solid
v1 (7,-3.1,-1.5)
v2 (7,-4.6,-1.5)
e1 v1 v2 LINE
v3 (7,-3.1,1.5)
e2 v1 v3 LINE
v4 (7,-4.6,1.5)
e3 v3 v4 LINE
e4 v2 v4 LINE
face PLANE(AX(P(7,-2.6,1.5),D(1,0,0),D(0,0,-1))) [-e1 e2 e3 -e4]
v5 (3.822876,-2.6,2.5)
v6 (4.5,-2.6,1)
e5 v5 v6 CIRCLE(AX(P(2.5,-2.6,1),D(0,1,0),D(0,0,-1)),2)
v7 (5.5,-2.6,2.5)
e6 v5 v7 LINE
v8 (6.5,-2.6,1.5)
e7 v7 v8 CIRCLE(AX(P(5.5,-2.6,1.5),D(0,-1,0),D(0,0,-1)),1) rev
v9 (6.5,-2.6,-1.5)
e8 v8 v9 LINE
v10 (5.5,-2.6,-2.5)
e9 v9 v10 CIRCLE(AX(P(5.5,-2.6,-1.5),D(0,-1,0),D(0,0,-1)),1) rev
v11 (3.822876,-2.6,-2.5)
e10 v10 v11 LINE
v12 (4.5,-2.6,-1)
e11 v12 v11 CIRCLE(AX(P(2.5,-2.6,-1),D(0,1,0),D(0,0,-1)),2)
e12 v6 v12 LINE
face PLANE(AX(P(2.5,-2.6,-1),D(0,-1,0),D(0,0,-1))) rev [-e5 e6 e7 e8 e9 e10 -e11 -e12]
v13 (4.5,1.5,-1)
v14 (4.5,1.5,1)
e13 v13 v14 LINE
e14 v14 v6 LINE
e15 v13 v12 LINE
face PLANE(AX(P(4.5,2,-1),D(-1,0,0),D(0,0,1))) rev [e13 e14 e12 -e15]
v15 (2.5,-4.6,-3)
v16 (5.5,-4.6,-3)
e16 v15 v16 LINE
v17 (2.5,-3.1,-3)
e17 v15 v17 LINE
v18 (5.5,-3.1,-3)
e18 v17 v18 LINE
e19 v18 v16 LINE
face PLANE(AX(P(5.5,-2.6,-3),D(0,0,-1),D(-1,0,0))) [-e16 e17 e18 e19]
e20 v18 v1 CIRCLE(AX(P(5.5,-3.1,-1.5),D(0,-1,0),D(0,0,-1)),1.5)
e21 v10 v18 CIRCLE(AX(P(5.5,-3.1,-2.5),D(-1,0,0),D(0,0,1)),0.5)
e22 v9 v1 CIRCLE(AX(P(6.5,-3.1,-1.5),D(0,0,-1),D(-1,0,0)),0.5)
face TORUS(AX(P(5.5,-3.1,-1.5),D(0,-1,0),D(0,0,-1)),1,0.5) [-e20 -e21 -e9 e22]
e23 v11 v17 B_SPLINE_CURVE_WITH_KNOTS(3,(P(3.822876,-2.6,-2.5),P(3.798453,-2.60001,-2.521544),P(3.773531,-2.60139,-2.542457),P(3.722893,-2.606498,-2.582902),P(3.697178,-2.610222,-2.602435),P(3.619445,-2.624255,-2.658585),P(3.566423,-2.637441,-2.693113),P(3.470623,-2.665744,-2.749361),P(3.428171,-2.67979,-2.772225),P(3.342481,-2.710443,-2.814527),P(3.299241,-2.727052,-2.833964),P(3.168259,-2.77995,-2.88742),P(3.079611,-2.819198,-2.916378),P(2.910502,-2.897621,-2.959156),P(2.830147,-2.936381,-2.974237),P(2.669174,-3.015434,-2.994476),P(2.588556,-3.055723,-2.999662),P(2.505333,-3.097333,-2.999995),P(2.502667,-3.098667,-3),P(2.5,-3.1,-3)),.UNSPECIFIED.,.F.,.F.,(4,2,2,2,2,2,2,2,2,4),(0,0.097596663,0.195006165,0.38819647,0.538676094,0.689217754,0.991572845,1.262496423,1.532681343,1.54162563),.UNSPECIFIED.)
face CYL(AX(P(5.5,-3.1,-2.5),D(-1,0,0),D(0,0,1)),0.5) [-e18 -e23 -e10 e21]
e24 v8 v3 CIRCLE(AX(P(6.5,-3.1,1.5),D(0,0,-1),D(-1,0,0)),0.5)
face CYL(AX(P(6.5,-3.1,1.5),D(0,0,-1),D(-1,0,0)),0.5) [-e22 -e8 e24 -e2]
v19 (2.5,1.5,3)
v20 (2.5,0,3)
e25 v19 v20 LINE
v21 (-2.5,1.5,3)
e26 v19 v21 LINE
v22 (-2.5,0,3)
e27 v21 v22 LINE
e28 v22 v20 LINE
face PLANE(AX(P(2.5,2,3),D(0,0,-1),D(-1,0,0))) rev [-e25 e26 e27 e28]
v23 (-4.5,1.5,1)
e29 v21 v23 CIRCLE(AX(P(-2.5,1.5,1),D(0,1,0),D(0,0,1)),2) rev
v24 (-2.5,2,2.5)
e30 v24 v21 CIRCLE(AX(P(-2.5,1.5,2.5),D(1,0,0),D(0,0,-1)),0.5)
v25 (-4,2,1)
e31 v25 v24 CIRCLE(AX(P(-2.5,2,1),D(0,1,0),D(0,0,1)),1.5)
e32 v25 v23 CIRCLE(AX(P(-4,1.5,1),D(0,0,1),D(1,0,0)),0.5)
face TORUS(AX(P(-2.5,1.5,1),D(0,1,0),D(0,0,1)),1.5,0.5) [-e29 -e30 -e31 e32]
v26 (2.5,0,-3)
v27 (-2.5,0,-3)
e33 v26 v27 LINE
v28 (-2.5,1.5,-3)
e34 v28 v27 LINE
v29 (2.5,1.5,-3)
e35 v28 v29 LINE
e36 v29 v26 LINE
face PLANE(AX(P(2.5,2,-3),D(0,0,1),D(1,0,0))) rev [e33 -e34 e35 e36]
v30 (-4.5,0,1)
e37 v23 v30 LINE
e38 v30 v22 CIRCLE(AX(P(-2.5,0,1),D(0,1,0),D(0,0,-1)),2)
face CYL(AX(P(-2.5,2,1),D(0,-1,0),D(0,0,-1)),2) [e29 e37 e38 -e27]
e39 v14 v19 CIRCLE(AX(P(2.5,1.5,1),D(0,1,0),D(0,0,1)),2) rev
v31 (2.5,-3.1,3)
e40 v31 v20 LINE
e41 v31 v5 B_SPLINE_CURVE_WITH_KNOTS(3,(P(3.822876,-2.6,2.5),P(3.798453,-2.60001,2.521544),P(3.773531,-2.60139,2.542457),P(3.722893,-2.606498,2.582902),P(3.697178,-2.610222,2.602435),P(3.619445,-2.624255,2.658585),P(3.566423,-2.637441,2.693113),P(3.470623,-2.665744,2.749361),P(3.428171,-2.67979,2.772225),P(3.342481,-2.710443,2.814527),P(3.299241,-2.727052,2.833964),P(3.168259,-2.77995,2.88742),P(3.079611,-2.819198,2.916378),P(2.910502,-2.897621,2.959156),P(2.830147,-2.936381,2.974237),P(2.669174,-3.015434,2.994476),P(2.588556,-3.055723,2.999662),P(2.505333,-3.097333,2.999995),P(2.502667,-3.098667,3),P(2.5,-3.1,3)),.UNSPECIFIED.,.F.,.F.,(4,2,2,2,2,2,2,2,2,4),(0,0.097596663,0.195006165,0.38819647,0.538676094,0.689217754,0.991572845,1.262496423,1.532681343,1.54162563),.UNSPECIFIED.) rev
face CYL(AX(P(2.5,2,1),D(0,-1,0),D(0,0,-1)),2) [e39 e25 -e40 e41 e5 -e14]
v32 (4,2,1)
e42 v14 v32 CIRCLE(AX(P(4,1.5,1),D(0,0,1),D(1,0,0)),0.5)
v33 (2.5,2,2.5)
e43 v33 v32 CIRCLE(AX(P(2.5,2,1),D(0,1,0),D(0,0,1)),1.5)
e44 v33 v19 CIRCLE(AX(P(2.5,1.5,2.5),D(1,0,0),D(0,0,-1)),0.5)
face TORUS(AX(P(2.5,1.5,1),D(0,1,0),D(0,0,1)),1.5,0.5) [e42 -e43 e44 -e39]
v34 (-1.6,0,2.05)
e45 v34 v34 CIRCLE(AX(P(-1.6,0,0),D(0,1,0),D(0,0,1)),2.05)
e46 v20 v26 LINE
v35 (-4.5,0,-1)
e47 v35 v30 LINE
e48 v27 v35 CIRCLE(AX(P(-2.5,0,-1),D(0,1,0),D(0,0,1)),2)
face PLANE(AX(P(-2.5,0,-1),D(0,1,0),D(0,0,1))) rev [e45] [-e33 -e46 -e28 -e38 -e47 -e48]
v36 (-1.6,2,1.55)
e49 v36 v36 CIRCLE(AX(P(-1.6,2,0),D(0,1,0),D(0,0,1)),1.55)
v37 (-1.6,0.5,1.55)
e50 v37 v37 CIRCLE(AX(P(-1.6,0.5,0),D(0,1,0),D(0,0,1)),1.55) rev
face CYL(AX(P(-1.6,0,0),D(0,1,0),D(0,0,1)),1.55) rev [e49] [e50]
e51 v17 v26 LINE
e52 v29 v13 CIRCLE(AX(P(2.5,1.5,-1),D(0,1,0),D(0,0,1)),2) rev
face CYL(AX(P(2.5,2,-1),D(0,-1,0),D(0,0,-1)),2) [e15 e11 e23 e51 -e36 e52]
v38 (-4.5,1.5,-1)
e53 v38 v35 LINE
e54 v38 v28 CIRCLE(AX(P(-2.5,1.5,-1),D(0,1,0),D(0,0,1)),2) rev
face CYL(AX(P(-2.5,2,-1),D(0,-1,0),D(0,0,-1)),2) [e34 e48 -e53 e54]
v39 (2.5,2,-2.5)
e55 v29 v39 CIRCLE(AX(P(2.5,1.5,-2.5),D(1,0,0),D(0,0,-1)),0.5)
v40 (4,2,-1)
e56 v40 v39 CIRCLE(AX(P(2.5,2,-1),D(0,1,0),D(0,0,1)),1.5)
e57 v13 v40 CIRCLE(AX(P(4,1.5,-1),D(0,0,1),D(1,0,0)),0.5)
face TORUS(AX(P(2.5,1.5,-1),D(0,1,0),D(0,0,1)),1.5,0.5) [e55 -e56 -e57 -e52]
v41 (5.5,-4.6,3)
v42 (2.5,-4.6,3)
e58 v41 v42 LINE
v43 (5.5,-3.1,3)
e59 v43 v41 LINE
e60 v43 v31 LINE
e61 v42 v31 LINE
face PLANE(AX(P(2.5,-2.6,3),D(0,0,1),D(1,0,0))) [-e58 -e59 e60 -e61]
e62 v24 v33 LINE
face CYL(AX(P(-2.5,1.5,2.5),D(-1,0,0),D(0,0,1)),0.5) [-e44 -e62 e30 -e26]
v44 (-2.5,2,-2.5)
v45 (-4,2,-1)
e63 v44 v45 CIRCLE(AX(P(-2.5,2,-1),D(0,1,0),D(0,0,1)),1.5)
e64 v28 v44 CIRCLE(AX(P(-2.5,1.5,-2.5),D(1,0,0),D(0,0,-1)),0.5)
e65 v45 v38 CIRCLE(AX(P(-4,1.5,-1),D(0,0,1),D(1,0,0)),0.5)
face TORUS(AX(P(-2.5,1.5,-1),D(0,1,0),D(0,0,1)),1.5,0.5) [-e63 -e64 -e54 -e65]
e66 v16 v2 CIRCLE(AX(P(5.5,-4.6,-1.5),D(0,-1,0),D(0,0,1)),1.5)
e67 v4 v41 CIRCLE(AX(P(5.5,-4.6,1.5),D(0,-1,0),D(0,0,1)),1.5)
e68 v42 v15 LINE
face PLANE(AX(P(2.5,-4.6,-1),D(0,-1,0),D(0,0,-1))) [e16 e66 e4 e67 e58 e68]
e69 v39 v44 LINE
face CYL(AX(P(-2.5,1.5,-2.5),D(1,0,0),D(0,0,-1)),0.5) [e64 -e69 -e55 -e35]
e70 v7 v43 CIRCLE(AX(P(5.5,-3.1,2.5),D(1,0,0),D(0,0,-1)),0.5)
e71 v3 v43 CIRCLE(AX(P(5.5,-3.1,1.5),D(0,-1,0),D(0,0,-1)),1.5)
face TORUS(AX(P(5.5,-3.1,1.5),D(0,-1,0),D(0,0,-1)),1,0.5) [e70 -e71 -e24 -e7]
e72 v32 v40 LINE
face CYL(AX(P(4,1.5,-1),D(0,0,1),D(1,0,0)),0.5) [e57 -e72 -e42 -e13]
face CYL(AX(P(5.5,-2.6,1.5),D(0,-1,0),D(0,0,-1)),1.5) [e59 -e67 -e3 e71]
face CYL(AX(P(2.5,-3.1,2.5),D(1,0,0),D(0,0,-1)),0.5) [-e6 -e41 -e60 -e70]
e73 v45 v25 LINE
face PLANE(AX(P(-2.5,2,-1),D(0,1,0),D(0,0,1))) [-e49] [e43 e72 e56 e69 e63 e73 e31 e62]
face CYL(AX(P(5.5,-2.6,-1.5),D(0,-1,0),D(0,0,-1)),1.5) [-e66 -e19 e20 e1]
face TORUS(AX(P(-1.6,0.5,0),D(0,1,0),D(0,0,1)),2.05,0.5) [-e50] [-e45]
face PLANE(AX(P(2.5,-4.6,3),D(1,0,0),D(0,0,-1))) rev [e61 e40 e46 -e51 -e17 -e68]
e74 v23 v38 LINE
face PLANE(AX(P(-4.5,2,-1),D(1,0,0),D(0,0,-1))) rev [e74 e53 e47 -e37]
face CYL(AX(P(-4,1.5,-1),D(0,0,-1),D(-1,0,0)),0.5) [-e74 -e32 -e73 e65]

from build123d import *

# Parameters (mm, degrees)
BOSS_EXTRUDE1_DEPTH     = 2
CUT_EXTRUDE1_DEPTH      = 6.766281297
CUT_EXTRUDE1_DEPTH_BACK = 6.766281297
SKETCH2_R               = 1.55
BOSS_EXTRUDE2_START     = 4.6
BOSS_EXTRUDE2_DEPTH     = 4.6
BOSS_EXTRUDE3_DEPTH     = 2
FILLET1_R               = 0.5


with BuildPart() as part:
    # Sketch1 → Boss-Extrude1 (new body)
    with BuildSketch(Plane(origin=(0, 0, 0), x_dir=(1, 0, 0), z_dir=(0, 1, 0))):
        with BuildLine():
            Line((2.5, 3), (-2.5, 3))
            ThreePointArc((-2.5, 3), (-3.914213562, 2.414213562), (-4.5, 1))
            Line((-4.5, 1), (-4.5, -1))
            ThreePointArc((-4.5, -1), (-3.914213562, -2.414213562), (-2.5, -3))
            Line((-2.5, -3), (2.5, -3))
            ThreePointArc((2.5, -3), (3.914213562, -2.414213562), (4.5, -1))
            Line((4.5, -1), (4.5, 1))
            ThreePointArc((4.5, 1), (3.914213562, 2.414213562), (2.5, 3))
        make_face()
    extrude(amount=BOSS_EXTRUDE1_DEPTH)

    # Sketch2 → Cut-Extrude1 (cut, two sides: drawn at the far end of the back side and taken through both)
    with BuildSketch(Plane(origin=(0, 2, 0), x_dir=(1, 0, 0), z_dir=(0, 1, 0)).offset(-CUT_EXTRUDE1_DEPTH_BACK)):
        with Locations(Location((-1.6, 0, 0), (0, 0, 270))):
            Circle(SKETCH2_R)
    extrude(amount=CUT_EXTRUDE1_DEPTH + CUT_EXTRUDE1_DEPTH_BACK, mode=Mode.SUBTRACT)

    # Sketch3 → Boss-Extrude2 (add)
    with BuildSketch(Plane.XZ.offset(BOSS_EXTRUDE2_START)):
        with BuildLine():
            Line((4.5, 1), (4.5, -1))
            ThreePointArc((4.5, -1), (3.914213562, -2.414213562), (2.5, -3))
            Line((2.5, -3), (2.5, 3))
            ThreePointArc((2.5, 3), (3.914213562, 2.414213562), (4.5, 1))
        make_face()
    extrude(amount=-BOSS_EXTRUDE2_DEPTH)

    # Sketch4 → Boss-Extrude3 (add)
    with BuildSketch(Plane.XZ.offset(4.6)):
        with BuildLine():
            Line((4.5, 1), (4.5, -1))
            ThreePointArc((4.5, -1), (3.914213562, -2.414213562), (2.5, -3))
            Line((2.5, -3), (5.5, -3))
            ThreePointArc((5.5, -3), (6.560660172, -2.560660172), (7, -1.5))
            Line((7, -1.5), (7, 1.5))
            ThreePointArc((7, 1.5), (6.560660172, 2.560660172), (5.5, 3))
            Line((5.5, 3), (2.5, 3))
            ThreePointArc((2.5, 3), (3.914213562, 2.414213562), (4.5, 1))
        make_face()
    extrude(amount=-BOSS_EXTRUDE3_DEPTH)

    # Fillet1
    # the kernel refuses this fillet: 0.5 mm, written as the material it takes off along each edge
    with BuildSketch(Plane(origin=(-2.5, 2, 1), x_dir=(-1, 0, 0), z_dir=(0, 0, -1))) as fillet1_piece_1:
        with BuildLine():
            CenterArc((2 - FILLET1_R, -FILLET1_R), FILLET1_R, 0, 90)
            Line((2, -FILLET1_R), (2, 0))
            Line((2, 0), (2 - FILLET1_R, 0))
        make_face()
    revolve(axis=Axis((-2.5, 2, 1), (0, 1, 0)), revolution_arc=90, mode=Mode.SUBTRACT)
    with BuildSketch(Plane(origin=(-2.5, 2, 3), x_dir=(0, 0, -1), z_dir=(1, 0, 0)), Plane(origin=(2.5, 2, -3), x_dir=(0, 0, 1), z_dir=(-1, 0, 0))) as fillet1_piece_2:
        with BuildLine():
            CenterArc((FILLET1_R, -FILLET1_R), FILLET1_R, 90, 90)
            Line((0, -FILLET1_R), (0, 0))
            Line((0, 0), (FILLET1_R, 0))
        make_face()
    extrude(amount=5, mode=Mode.SUBTRACT)
    with BuildSketch(Plane(origin=(2.5, 2, 1), x_dir=(0, 0, 1), z_dir=(-1, 0, 0))) as fillet1_piece_3:
        with BuildLine():
            CenterArc((2 - FILLET1_R, -FILLET1_R), FILLET1_R, 0, 90)
            Line((2 - FILLET1_R, 0), (2, 0))
            Line((2, 0), (2, -FILLET1_R))
        make_face()
    revolve(axis=Axis((2.5, 2, 1), (0, 1, 0)), revolution_arc=90, mode=Mode.SUBTRACT)
    with BuildSketch(Plane(origin=(4.5, 2, 1), x_dir=(0, -1, 0), z_dir=(0, 0, -1))) as fillet1_piece_4:
        with BuildLine():
            CenterArc((FILLET1_R, FILLET1_R), FILLET1_R, 180, 90)
            Line((0, FILLET1_R), (0, 0))
            Line((0, 0), (FILLET1_R, 0))
        make_face()
    extrude(amount=2, mode=Mode.SUBTRACT)
    with BuildSketch(Plane(origin=(-1.6, 0, 0), x_dir=(0, 0, 1), z_dir=(-1, 0, 0))) as fillet1_piece_5:
        with BuildLine():
            CenterArc((1.55 + FILLET1_R, FILLET1_R), FILLET1_R, 180, 90)
            Line((1.55 + FILLET1_R, 0), (1.55, 0))
            Line((1.55, 0), (1.55, FILLET1_R))
        make_face()
    revolve(axis=Axis((-1.6, 0, 0), (0, 1, 0)), mode=Mode.SUBTRACT)
    with BuildSketch(Plane(origin=(2.5, 2, -1), x_dir=(1, 0, 0), z_dir=(0, 0, 1))) as fillet1_piece_6:
        with BuildLine():
            CenterArc((2 - FILLET1_R, -FILLET1_R), FILLET1_R, 0, 90)
            Line((2 - FILLET1_R, 0), (2, 0))
            Line((2, 0), (2, -FILLET1_R))
        make_face()
    revolve(axis=Axis((2.5, 2, -1), (0, 1, 0)), revolution_arc=90, mode=Mode.SUBTRACT)
    with BuildSketch(Plane(origin=(5.5, -2.6, 3), x_dir=(0, 0, -1), z_dir=(-1, 0, 0))) as fillet1_piece_7_section:
        with BuildLine():
            CenterArc((FILLET1_R, FILLET1_R), FILLET1_R, 180, 90)
            Line((0, FILLET1_R), (0, 0))
            Line((0, 0), (FILLET1_R, 0))
        make_face()
    fillet1_piece_7 = extrude(amount=4.25, mode=Mode.PRIVATE)
    fillet1_piece_7 = fillet1_piece_7 - Plane(origin=(2.5, -2.684531393, 1), x_dir=(0, 0, 1), z_dir=(0, -1, 0)) * Cylinder(2, 11, mode=Mode.PRIVATE)
    add(fillet1_piece_7, mode=Mode.SUBTRACT)
    with BuildSketch(Plane(origin=(5.5, -2.6, 1.5), x_dir=(1, 0, 0), z_dir=(0, 0, -1))) as fillet1_piece_8:
        with BuildLine():
            CenterArc((1.5 - FILLET1_R, FILLET1_R), FILLET1_R, 270, 90)
            Line((1.5, FILLET1_R), (1.5, 0))
            Line((1.5, 0), (1.5 - FILLET1_R, 0))
        make_face()
    revolve(axis=Axis((5.5, -2.6, 1.5), (0, -1, 0)), revolution_arc=90, mode=Mode.SUBTRACT)
    with BuildSketch(Plane(origin=(7, -2.6, -1.5), x_dir=(-1, 0, 0), z_dir=(0, 0, 1))) as fillet1_piece_9:
        with BuildLine():
            CenterArc((FILLET1_R, FILLET1_R), FILLET1_R, 180, 90)
            Line((0, FILLET1_R), (0, 0))
            Line((0, 0), (FILLET1_R, 0))
        make_face()
    extrude(amount=3, mode=Mode.SUBTRACT)
    with BuildSketch(Plane(origin=(5.5, -2.6, -1.5), x_dir=(0, 0, -1), z_dir=(-1, 0, 0))) as fillet1_piece_10:
        with BuildLine():
            CenterArc((1.5 - FILLET1_R, FILLET1_R), FILLET1_R, 270, 90)
            Line((1.5, FILLET1_R), (1.5, 0))
            Line((1.5, 0), (1.5 - FILLET1_R, 0))
        make_face()
    revolve(axis=Axis((5.5, -2.6, -1.5), (0, -1, 0)), revolution_arc=90, mode=Mode.SUBTRACT)
    with BuildSketch(Plane(origin=(1.25, -2.6, -3), x_dir=(0, 0, 1), z_dir=(1, 0, 0))) as fillet1_piece_11_section:
        with BuildLine():
            CenterArc((FILLET1_R, FILLET1_R), FILLET1_R, 180, 90)
            Line((0, FILLET1_R), (0, 0))
            Line((0, 0), (FILLET1_R, 0))
        make_face()
    fillet1_piece_11 = extrude(amount=4.25, mode=Mode.PRIVATE)
    fillet1_piece_11 = fillet1_piece_11 - Plane(origin=(2.5, -2.72746411, -1), x_dir=(1, 0, 0), z_dir=(0, -1, 0)) * Cylinder(2, 11, mode=Mode.PRIVATE)
    add(fillet1_piece_11, mode=Mode.SUBTRACT)
    with BuildSketch(Plane(origin=(-2.5, 2, -1), x_dir=(0, 0, -1), z_dir=(1, 0, 0))) as fillet1_piece_12:
        with BuildLine():
            CenterArc((2 - FILLET1_R, -FILLET1_R), FILLET1_R, 0, 90)
            Line((2, -FILLET1_R), (2, 0))
            Line((2, 0), (2 - FILLET1_R, 0))
        make_face()
    revolve(axis=Axis((-2.5, 2, -1), (0, 1, 0)), revolution_arc=90, mode=Mode.SUBTRACT)
    with BuildSketch(Plane(origin=(-4.5, 2, -1), x_dir=(1, 0, 0), z_dir=(0, 0, 1))) as fillet1_piece_13:
        with BuildLine():
            CenterArc((FILLET1_R, -FILLET1_R), FILLET1_R, 90, 90)
            Line((0, -FILLET1_R), (0, 0))
            Line((0, 0), (FILLET1_R, 0))
        make_face()
    extrude(amount=2, mode=Mode.SUBTRACT)


solid = part.part
